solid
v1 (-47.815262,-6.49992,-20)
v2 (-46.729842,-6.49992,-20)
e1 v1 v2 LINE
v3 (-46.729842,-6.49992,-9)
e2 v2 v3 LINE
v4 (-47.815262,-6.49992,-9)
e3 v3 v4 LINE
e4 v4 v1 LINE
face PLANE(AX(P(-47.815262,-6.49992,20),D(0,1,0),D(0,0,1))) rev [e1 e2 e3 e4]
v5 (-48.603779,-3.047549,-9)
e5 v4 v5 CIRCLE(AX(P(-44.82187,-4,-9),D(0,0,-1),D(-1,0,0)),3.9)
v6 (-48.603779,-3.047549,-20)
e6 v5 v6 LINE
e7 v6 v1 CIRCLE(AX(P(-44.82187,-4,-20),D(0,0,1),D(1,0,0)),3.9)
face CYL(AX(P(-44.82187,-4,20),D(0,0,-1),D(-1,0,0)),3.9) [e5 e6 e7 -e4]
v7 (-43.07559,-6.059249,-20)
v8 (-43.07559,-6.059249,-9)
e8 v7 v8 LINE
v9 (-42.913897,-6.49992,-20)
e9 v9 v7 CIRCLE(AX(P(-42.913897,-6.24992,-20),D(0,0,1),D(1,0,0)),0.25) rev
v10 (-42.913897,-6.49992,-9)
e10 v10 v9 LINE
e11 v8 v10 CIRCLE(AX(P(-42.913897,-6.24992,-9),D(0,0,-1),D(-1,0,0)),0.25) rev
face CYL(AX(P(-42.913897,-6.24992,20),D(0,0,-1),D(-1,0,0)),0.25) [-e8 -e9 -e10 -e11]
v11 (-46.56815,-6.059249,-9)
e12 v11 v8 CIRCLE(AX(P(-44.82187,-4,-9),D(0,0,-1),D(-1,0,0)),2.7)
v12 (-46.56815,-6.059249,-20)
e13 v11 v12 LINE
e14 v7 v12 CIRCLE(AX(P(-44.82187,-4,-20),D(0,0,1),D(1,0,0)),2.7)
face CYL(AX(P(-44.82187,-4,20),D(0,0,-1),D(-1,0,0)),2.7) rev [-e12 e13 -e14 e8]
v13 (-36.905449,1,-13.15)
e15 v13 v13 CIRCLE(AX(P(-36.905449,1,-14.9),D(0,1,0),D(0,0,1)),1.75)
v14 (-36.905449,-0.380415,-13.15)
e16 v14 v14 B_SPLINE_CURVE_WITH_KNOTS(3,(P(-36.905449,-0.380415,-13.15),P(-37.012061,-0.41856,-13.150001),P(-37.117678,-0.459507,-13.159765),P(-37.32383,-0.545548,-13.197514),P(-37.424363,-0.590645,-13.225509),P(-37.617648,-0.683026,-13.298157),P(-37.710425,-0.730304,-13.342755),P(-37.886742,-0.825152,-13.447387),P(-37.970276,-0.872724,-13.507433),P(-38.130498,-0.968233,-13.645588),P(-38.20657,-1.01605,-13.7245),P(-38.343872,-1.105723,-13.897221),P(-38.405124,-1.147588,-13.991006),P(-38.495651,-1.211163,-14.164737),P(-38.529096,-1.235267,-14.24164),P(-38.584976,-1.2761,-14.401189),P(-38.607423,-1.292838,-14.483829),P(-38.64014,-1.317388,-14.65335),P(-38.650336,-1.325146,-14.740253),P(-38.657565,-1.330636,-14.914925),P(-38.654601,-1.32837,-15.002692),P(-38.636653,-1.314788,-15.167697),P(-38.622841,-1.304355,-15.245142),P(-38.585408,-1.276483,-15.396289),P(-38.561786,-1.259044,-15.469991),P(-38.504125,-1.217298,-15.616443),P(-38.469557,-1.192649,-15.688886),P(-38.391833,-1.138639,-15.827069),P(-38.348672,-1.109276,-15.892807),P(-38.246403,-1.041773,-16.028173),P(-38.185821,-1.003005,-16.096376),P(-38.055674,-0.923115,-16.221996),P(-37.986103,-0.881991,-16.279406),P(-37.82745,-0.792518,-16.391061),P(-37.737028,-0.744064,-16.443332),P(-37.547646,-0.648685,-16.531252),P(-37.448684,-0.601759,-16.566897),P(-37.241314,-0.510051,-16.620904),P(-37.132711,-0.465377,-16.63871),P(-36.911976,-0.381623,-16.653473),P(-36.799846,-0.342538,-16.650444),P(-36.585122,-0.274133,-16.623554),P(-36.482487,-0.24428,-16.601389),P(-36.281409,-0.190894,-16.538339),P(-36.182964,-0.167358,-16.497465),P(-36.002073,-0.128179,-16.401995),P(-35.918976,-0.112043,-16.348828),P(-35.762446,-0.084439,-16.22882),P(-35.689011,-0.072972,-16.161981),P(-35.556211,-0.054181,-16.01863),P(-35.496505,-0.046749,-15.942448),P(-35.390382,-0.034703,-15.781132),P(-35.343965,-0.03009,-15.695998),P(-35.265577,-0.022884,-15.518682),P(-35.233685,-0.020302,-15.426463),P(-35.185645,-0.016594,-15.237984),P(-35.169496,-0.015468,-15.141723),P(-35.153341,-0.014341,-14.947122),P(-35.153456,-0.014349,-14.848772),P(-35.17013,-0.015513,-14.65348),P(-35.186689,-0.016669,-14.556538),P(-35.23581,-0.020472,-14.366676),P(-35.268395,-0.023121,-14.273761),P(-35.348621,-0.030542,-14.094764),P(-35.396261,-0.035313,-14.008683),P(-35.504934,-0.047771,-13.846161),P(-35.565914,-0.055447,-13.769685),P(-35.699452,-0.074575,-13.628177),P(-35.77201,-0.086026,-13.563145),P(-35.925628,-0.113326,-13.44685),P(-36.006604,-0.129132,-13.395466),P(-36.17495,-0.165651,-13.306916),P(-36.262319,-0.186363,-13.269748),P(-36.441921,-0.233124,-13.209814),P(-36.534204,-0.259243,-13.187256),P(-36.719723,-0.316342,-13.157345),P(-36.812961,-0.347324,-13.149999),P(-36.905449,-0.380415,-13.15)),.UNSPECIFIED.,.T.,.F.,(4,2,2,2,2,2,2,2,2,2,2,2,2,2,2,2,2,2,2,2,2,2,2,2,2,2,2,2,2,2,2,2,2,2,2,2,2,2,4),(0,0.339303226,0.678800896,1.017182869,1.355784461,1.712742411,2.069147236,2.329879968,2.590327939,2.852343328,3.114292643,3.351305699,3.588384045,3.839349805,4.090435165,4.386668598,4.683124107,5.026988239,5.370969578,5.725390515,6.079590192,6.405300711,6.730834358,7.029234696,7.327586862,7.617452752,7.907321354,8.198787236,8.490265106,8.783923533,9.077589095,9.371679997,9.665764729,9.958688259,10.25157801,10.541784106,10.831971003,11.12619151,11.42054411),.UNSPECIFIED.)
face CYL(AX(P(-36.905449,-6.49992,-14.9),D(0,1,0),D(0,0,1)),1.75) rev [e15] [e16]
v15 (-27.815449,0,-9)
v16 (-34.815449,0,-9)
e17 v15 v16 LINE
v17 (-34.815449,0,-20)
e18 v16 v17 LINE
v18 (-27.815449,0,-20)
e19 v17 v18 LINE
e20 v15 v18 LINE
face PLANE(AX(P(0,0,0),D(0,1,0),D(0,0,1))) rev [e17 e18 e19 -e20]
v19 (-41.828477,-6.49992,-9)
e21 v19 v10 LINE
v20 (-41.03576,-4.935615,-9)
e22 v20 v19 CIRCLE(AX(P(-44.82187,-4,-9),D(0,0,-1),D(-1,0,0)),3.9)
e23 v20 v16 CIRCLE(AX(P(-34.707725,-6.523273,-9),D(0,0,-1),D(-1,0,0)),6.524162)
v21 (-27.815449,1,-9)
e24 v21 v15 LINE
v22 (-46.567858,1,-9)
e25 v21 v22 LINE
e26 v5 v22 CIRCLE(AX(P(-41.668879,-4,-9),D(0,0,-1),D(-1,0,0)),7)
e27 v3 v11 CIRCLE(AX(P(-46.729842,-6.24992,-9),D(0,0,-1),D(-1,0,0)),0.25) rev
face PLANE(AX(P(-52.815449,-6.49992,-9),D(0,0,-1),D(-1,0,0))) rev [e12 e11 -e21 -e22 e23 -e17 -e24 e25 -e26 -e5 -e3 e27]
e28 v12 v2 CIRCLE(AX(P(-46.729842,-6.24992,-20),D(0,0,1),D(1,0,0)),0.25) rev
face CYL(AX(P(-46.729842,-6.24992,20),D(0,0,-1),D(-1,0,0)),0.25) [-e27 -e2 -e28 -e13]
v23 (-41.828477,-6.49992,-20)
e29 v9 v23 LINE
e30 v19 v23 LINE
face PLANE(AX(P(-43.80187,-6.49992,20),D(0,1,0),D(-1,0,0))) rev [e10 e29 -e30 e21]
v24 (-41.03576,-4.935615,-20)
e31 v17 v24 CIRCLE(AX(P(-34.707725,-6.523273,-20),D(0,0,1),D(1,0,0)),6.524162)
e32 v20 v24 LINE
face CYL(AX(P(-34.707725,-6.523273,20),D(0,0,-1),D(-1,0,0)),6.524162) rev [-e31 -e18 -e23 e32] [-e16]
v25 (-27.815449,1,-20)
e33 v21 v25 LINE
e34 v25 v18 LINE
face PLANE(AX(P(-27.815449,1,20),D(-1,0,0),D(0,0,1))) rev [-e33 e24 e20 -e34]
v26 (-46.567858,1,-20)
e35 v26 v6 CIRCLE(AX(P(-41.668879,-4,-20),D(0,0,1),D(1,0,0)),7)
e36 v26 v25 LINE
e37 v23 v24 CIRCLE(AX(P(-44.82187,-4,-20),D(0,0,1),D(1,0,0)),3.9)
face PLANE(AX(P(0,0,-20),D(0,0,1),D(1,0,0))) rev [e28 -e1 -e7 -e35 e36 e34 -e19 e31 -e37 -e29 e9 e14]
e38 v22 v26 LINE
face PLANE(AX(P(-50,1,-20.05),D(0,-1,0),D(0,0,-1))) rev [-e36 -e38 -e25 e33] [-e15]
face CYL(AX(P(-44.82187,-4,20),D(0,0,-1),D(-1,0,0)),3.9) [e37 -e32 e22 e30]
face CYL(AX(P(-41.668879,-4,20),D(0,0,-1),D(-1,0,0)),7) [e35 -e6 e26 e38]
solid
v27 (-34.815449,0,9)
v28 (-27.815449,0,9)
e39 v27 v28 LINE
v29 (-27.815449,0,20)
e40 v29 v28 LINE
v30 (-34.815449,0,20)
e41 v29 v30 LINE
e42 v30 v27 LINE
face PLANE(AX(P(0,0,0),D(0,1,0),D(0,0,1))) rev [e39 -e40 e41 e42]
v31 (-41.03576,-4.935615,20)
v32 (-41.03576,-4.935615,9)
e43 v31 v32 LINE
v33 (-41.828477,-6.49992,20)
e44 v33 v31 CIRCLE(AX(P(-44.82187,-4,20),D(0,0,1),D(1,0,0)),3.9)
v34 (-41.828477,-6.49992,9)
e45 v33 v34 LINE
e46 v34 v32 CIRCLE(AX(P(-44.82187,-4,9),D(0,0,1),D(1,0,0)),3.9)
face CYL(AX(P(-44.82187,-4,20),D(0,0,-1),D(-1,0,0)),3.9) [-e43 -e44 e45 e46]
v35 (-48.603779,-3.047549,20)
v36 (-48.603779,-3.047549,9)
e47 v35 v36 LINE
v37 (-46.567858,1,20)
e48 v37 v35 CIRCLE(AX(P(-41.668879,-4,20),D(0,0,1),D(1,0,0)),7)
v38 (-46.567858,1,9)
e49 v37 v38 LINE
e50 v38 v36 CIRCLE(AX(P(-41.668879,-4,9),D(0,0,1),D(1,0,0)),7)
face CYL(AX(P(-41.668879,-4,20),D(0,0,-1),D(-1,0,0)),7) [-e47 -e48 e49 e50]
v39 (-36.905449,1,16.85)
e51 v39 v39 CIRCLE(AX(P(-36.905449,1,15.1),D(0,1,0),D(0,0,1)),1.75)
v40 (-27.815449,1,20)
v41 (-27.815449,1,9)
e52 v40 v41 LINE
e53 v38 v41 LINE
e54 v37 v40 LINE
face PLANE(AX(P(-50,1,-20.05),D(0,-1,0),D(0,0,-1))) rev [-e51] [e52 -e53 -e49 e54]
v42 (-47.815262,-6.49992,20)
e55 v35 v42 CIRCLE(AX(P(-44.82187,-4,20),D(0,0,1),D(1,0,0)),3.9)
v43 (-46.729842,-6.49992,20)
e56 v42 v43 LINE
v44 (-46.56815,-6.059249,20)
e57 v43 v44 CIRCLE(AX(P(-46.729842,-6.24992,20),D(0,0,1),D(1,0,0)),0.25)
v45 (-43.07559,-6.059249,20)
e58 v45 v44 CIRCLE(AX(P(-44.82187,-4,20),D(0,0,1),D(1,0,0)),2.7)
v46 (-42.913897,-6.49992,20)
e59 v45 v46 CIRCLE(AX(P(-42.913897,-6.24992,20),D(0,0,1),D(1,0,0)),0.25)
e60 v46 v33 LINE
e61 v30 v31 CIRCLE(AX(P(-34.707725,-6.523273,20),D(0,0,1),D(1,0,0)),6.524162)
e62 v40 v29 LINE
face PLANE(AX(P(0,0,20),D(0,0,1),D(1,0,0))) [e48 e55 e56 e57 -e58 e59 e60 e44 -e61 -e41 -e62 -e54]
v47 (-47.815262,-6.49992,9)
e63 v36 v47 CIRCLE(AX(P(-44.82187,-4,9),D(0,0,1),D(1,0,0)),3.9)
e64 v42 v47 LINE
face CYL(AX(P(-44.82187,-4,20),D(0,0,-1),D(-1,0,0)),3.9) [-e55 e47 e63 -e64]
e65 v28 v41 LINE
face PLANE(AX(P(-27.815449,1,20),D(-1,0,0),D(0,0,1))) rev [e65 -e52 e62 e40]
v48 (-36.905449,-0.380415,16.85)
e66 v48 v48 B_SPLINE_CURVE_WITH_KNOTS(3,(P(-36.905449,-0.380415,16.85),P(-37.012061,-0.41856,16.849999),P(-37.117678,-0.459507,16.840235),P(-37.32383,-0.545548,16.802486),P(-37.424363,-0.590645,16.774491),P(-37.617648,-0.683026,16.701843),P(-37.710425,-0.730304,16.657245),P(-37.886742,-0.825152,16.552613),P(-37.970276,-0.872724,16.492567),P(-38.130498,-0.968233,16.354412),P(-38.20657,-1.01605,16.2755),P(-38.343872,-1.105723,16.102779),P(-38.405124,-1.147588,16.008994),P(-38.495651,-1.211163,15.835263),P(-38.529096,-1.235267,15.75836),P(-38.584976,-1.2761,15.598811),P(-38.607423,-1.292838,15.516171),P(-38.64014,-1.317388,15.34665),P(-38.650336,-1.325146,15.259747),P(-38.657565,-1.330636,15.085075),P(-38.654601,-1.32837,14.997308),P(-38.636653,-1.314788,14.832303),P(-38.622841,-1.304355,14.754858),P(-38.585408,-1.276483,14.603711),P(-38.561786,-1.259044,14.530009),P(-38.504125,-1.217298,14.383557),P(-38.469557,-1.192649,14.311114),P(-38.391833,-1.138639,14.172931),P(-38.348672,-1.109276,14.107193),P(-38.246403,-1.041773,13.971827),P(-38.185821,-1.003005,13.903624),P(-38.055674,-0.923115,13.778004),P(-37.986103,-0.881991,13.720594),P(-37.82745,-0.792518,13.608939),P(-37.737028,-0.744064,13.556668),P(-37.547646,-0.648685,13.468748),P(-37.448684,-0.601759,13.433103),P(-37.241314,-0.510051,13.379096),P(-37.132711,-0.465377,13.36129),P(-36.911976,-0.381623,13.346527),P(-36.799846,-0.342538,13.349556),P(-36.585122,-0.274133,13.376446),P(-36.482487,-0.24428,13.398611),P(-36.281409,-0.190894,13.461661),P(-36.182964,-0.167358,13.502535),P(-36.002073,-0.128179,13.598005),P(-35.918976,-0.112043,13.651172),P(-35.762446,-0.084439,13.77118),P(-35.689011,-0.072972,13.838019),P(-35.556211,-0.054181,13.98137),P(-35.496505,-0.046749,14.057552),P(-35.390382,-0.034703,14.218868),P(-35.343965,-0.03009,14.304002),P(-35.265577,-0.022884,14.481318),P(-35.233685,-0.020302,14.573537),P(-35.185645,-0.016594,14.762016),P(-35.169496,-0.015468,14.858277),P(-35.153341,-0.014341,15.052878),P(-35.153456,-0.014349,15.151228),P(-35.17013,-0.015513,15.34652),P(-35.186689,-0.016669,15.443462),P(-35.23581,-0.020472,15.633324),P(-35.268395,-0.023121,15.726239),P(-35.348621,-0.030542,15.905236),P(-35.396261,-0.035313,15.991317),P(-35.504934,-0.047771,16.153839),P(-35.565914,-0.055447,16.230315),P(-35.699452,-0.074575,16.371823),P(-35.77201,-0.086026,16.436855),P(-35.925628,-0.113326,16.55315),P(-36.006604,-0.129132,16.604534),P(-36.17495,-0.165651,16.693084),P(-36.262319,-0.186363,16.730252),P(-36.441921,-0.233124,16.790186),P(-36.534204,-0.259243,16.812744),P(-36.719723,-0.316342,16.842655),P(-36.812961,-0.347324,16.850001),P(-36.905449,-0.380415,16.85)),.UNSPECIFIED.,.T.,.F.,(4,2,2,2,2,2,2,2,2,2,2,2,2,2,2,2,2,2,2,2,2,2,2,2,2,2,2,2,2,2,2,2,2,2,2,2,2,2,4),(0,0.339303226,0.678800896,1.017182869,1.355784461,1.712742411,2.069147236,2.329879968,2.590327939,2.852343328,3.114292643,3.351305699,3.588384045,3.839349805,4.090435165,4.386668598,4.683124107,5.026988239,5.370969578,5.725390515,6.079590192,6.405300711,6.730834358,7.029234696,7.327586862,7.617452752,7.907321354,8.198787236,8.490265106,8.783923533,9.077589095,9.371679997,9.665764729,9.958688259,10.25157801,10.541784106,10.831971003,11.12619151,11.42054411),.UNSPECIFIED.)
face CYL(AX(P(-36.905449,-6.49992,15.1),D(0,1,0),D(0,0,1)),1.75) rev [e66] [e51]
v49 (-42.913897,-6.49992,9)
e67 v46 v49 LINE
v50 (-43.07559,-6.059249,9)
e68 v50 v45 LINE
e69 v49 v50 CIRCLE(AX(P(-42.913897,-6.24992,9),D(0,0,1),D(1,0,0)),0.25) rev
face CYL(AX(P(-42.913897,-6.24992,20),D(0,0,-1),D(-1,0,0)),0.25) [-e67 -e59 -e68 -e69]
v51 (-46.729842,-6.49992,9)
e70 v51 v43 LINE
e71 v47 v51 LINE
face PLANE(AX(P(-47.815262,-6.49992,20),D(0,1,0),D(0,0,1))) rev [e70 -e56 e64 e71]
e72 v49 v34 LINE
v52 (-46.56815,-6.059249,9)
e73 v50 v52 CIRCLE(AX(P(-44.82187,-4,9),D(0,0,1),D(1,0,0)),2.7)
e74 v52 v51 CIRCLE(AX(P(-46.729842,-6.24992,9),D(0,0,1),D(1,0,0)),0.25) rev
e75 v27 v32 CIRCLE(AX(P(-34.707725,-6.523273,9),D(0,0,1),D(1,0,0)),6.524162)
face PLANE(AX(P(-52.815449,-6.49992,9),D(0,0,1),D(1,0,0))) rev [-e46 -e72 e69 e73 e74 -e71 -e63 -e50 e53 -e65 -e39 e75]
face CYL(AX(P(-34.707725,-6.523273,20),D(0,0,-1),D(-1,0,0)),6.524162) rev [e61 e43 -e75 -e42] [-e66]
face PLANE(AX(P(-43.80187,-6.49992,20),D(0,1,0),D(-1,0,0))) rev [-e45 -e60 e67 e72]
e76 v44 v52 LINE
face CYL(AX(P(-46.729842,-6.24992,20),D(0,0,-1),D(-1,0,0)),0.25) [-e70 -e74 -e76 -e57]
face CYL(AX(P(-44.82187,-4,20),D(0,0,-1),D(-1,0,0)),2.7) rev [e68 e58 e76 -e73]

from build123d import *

# Parameters (mm, degrees)
EXTRUDE_1_DEPTH                            = 3.9
EXTRUDE_3_DEPTH                            = 20
EXTRUDE_5_DEPTH                            = 20
FILLET_1_R                                 = 0.25
FILLET_1_OF_MIRROR_2_R                     = 0.25
SKETCH_7_R                                 = 5.5
CUT_EXTRUDE_3_DEPTH                        = 69.146236458
MIRROR_3_AT_THE_SECOND_PLANE_COPY_1_SKET_R = 5.5
MIRROR_3_AT_THE_SECOND_PLANE_COPY_1_DEPTH  = 69.146236458
ESQUISSE1_W                                = 44.6
ESQUISSE1_H                                = 40
ENL_V_MAT_EXTRU_1_DEPTH                    = 1.54
ENL_V_MAT_EXTRU_2_DEPTH                    = 57.761068742
ESQUISSE3_W                                = 50
ESQUISSE3_H                                = 1.36
ENL_V_MAT_EXTRU_3_DEPTH                    = 64.372466761
ESQUISSE4_W                                = 27.815449133
ESQUISSE4_H                                = 40
ENL_V_MAT_EXTRU_4_DEPTH                    = 54.066651895
ESQUISSE5_R                                = 1.75
ENL_V_MAT_EXTRU_5_DEPTH                    = 54.198396436
ESQUISSE6_W                                = 25
ESQUISSE6_H                                = 18
ENL_V_MAT_EXTRU_6_DEPTH                    = 54.198396473


with BuildPart() as part:
    # Эскиз1 → Бобышка-Вытянуть1 (new body)
    with BuildSketch(Plane(origin=(0, 0, 0), x_dir=(1, 0, 0), z_dir=(0, 1, 0))):
        with BuildLine():
            ThreePointArc((-44.6, -23.2), (-43.428427125, -26.028427125), (-40.6, -27.2))
            Line((-40.6, -27.2), (40.6, -27.2))
            ThreePointArc((40.6, -27.2), (43.428427125, -26.028427125), (44.6, -23.2))
            Line((44.6, -23.2), (44.6, 23.2))
            ThreePointArc((44.6, 23.2), (43.428427125, 26.028427125), (40.6, 27.2))
            Line((40.6, 27.2), (33.6, 27.2))
            Line((33.6, 27.2), (-5.4, 27.2))
            Line((-5.4, 27.2), (-40.6, 27.2))
            ThreePointArc((-40.6, 27.2), (-43.428427125, 26.028427125), (-44.6, 23.2))
            Line((-44.6, 23.2), (-44.6, -23.2))
        make_face()
    extrude(amount=EXTRUDE_1_DEPTH)



with BuildPart() as body_2:
    # Эскиз3 → Бобышка-Вытянуть3 (new, symmetric)
    with BuildSketch(Plane.XY):
        with BuildLine():
            Line((-47.815262386, -6.499919999), (-45.841869662, -6.499919999))
            ThreePointArc((-45.841869662, -6.499919999), (-44.821869662, -1.3), (-43.801869662, -6.499919999))
            Line((-43.801869662, -6.499919999), (-41.828476938, -6.499919999))
            ThreePointArc((-41.828476938, -6.499919999), (-44.821869662, -0.1), (-47.815262386, -6.499919999))
        make_face()
    extrude_3 = extrude(amount=EXTRUDE_3_DEPTH, both=True)


with BuildPart() as part_1:
    add(part.part)

    add(body_2.part)  # Бобышка-Вытянуть5 merges body 2
    # Эскиз5 → Бобышка-Вытянуть5 (add, symmetric)
    with BuildSketch(Plane.XY):
        with BuildLine():
            ThreePointArc((-41.631827579, 2.999901942), (-46.932438451, 0.61464415), (-48.60377877, -4.952451312))
            Line((-48.60377877, -4.952451312), (-47.348297278, -4.952451312))
            ThreePointArc((-47.348297278, -4.952451312), (-44.821869662, -1.3), (-42.295442046, -4.952451312))
            Line((-42.295442046, -4.952451312), (-41.039960555, -4.952451312))
            ThreePointArc((-41.039960555, -4.952451312), (-38.684888017, -1.351535806), (-34.6, 0))
            Line((-34.6, 0), (-36.641600827, 0.870983001))
            ThreePointArc((-36.641600827, 0.870983001), (-38.922074934, 2.438561027), (-41.631827579, 2.999901942))
        make_face()
    extrude_5 = extrude(amount=EXTRUDE_5_DEPTH, both=True)

    # Скругление1
    fillet_1_edges = [part_1.edges().sort_by_distance(p)[0] for p in [
        (-43.801869662, -6.499919999, 0),
        (-45.841869662, -6.499919999, 0),
    ]]
    fillet(fillet_1_edges, radius=FILLET_1_R)

    # Зеркальное отражение1: Бобышка-Вытянуть5 across plane
    add(extrude_5.mirror(Plane(origin=(0, 0, 0), x_dir=(0, 0, 1), z_dir=(1, 0, 0))))

    # Зеркальное отражение2: Бобышка-Вытянуть3 across plane
    add(extrude_3.mirror(Plane(origin=(0, 0, 0), x_dir=(0, 0, 1), z_dir=(1, 0, 0))))

    # Скругление1 of Зеркальное отражение2
    fillet_1_of_mirror_2_edges = [part_1.edges().sort_by_distance(p)[0] for p in [
        (43.801869662, -6.499919999, 0),
        (45.841869662, -6.499919999, 0),
    ]]
    fillet(fillet_1_of_mirror_2_edges, radius=FILLET_1_OF_MIRROR_2_R)

    # Эскиз7 → Вырез-Вытянуть3 (cut, through all)
    with BuildSketch(Plane.XY.offset(20)):
        with Locations((-45, -4)):
            Circle(SKETCH_7_R)
    cut_extrude_3 = extrude(amount=CUT_EXTRUDE_3_DEPTH, mode=Mode.SUBTRACT)

    # Зеркальное отражение3: Вырез-Вытянуть3 across plane
    add(cut_extrude_3.mirror(Plane(origin=(0, 0, 0), x_dir=(0, 0, 1), z_dir=(1, 0, 0))), mode=Mode.SUBTRACT)

    # Зеркальное отражение3 at the second plane: Вырез-Вытянуть3 across plane
    add(cut_extrude_3.mirror(Plane.XY), mode=Mode.SUBTRACT)

    # Зеркальное отражение3 at the second plane copy 1 sket → Зеркальное отражение3 at the second plane copy 1 (cut, through all)
    with BuildSketch(Plane(origin=(0, 0, -20), x_dir=(-1, 0, 0), z_dir=(0, 0, -1))):
        with Locations((-45, -4)):
            Circle(MIRROR_3_AT_THE_SECOND_PLANE_COPY_1_SKET_R)
    extrude(amount=MIRROR_3_AT_THE_SECOND_PLANE_COPY_1_DEPTH, mode=Mode.SUBTRACT)

    # Esquisse1 → Enlèv. mat.-Extru.1 (cut)
    with BuildSketch(Plane(origin=(0, 3.9, 0), x_dir=(1, 0, 0), z_dir=(0, 1, 0))):
        with Locations((-22.3, 0)):
            Rectangle(ESQUISSE1_W, ESQUISSE1_H)
    extrude(amount=-ENL_V_MAT_EXTRU_1_DEPTH, mode=Mode.SUBTRACT)

    # Esquisse2 → Enlèv. mat.-Extru.2 (cut, through all)
    with BuildSketch(Plane(origin=(0, 3.9, 0), x_dir=(1, 0, 0), z_dir=(0, 1, 0))):
        Polygon((-44.6, 20), (-44.6, 27.2), (51.6, 27.2), (51.6, -27.2), (-44.6, -27.2), (-44.6, -20), (0, -20), (0, 20), align=None)
    extrude(amount=-ENL_V_MAT_EXTRU_2_DEPTH, mode=Mode.SUBTRACT)

    # Esquisse3 → Enlèv. mat.-Extru.3 (cut, through all)
    with BuildSketch(Plane.XY.offset(20)):
        with Locations((-25, 1.68)):
            Rectangle(ESQUISSE3_W, ESQUISSE3_H)
    extrude(amount=-ENL_V_MAT_EXTRU_3_DEPTH, mode=Mode.SUBTRACT)

    # Esquisse4 → Enlèv. mat.-Extru.4 (cut, through all)
    with BuildSketch(Plane.XZ):
        with Locations((-13.907724567, 0)):
            Rectangle(ESQUISSE4_W, ESQUISSE4_H)
    extrude(amount=-ENL_V_MAT_EXTRU_4_DEPTH, mode=Mode.SUBTRACT)

    # Esquisse5 → Enlèv. mat.-Extru.5 (cut, through all)
    with BuildSketch(Plane(origin=(0, 1, 0), x_dir=(1, 0, 0), z_dir=(0, 1, 0))):
        with Locations((-36.905449133, 14.9)):
            Circle(ESQUISSE5_R)
        with Locations((-36.905449133, -15.1)):
            Circle(ESQUISSE5_R)
    extrude(amount=-ENL_V_MAT_EXTRU_5_DEPTH, mode=Mode.SUBTRACT)

    # Esquisse6 → Enlèv. mat.-Extru.6 (cut, through all)
    with BuildSketch(Plane(origin=(0, 1, 0), x_dir=(1, 0, 0), z_dir=(0, 1, 0))):
        with Locations((-40.315449133, 0)):
            Rectangle(ESQUISSE6_W, ESQUISSE6_H)
    extrude(amount=-ENL_V_MAT_EXTRU_6_DEPTH, mode=Mode.SUBTRACT)


with BuildPart() as enl_v_mat_extru_6_piece_1:
    # of the separate pieces the step leaves, piece 1, a body of its own (enl_v_mat_extru_6_pieces)
    add(part_1.part.solids().sort_by_distance((-42.913896916, -6.499919999, -20))[0])


with BuildPart() as enl_v_mat_extru_6_piece_2:
    # of the separate pieces the step leaves, piece 2, a body of its own (enl_v_mat_extru_6_pieces)
    add(part_1.part.solids().sort_by_distance((-42.913896916, -6.499919999, 20))[0])


solid = Compound([enl_v_mat_extru_6_piece_1.part, enl_v_mat_extru_6_piece_2.part])
